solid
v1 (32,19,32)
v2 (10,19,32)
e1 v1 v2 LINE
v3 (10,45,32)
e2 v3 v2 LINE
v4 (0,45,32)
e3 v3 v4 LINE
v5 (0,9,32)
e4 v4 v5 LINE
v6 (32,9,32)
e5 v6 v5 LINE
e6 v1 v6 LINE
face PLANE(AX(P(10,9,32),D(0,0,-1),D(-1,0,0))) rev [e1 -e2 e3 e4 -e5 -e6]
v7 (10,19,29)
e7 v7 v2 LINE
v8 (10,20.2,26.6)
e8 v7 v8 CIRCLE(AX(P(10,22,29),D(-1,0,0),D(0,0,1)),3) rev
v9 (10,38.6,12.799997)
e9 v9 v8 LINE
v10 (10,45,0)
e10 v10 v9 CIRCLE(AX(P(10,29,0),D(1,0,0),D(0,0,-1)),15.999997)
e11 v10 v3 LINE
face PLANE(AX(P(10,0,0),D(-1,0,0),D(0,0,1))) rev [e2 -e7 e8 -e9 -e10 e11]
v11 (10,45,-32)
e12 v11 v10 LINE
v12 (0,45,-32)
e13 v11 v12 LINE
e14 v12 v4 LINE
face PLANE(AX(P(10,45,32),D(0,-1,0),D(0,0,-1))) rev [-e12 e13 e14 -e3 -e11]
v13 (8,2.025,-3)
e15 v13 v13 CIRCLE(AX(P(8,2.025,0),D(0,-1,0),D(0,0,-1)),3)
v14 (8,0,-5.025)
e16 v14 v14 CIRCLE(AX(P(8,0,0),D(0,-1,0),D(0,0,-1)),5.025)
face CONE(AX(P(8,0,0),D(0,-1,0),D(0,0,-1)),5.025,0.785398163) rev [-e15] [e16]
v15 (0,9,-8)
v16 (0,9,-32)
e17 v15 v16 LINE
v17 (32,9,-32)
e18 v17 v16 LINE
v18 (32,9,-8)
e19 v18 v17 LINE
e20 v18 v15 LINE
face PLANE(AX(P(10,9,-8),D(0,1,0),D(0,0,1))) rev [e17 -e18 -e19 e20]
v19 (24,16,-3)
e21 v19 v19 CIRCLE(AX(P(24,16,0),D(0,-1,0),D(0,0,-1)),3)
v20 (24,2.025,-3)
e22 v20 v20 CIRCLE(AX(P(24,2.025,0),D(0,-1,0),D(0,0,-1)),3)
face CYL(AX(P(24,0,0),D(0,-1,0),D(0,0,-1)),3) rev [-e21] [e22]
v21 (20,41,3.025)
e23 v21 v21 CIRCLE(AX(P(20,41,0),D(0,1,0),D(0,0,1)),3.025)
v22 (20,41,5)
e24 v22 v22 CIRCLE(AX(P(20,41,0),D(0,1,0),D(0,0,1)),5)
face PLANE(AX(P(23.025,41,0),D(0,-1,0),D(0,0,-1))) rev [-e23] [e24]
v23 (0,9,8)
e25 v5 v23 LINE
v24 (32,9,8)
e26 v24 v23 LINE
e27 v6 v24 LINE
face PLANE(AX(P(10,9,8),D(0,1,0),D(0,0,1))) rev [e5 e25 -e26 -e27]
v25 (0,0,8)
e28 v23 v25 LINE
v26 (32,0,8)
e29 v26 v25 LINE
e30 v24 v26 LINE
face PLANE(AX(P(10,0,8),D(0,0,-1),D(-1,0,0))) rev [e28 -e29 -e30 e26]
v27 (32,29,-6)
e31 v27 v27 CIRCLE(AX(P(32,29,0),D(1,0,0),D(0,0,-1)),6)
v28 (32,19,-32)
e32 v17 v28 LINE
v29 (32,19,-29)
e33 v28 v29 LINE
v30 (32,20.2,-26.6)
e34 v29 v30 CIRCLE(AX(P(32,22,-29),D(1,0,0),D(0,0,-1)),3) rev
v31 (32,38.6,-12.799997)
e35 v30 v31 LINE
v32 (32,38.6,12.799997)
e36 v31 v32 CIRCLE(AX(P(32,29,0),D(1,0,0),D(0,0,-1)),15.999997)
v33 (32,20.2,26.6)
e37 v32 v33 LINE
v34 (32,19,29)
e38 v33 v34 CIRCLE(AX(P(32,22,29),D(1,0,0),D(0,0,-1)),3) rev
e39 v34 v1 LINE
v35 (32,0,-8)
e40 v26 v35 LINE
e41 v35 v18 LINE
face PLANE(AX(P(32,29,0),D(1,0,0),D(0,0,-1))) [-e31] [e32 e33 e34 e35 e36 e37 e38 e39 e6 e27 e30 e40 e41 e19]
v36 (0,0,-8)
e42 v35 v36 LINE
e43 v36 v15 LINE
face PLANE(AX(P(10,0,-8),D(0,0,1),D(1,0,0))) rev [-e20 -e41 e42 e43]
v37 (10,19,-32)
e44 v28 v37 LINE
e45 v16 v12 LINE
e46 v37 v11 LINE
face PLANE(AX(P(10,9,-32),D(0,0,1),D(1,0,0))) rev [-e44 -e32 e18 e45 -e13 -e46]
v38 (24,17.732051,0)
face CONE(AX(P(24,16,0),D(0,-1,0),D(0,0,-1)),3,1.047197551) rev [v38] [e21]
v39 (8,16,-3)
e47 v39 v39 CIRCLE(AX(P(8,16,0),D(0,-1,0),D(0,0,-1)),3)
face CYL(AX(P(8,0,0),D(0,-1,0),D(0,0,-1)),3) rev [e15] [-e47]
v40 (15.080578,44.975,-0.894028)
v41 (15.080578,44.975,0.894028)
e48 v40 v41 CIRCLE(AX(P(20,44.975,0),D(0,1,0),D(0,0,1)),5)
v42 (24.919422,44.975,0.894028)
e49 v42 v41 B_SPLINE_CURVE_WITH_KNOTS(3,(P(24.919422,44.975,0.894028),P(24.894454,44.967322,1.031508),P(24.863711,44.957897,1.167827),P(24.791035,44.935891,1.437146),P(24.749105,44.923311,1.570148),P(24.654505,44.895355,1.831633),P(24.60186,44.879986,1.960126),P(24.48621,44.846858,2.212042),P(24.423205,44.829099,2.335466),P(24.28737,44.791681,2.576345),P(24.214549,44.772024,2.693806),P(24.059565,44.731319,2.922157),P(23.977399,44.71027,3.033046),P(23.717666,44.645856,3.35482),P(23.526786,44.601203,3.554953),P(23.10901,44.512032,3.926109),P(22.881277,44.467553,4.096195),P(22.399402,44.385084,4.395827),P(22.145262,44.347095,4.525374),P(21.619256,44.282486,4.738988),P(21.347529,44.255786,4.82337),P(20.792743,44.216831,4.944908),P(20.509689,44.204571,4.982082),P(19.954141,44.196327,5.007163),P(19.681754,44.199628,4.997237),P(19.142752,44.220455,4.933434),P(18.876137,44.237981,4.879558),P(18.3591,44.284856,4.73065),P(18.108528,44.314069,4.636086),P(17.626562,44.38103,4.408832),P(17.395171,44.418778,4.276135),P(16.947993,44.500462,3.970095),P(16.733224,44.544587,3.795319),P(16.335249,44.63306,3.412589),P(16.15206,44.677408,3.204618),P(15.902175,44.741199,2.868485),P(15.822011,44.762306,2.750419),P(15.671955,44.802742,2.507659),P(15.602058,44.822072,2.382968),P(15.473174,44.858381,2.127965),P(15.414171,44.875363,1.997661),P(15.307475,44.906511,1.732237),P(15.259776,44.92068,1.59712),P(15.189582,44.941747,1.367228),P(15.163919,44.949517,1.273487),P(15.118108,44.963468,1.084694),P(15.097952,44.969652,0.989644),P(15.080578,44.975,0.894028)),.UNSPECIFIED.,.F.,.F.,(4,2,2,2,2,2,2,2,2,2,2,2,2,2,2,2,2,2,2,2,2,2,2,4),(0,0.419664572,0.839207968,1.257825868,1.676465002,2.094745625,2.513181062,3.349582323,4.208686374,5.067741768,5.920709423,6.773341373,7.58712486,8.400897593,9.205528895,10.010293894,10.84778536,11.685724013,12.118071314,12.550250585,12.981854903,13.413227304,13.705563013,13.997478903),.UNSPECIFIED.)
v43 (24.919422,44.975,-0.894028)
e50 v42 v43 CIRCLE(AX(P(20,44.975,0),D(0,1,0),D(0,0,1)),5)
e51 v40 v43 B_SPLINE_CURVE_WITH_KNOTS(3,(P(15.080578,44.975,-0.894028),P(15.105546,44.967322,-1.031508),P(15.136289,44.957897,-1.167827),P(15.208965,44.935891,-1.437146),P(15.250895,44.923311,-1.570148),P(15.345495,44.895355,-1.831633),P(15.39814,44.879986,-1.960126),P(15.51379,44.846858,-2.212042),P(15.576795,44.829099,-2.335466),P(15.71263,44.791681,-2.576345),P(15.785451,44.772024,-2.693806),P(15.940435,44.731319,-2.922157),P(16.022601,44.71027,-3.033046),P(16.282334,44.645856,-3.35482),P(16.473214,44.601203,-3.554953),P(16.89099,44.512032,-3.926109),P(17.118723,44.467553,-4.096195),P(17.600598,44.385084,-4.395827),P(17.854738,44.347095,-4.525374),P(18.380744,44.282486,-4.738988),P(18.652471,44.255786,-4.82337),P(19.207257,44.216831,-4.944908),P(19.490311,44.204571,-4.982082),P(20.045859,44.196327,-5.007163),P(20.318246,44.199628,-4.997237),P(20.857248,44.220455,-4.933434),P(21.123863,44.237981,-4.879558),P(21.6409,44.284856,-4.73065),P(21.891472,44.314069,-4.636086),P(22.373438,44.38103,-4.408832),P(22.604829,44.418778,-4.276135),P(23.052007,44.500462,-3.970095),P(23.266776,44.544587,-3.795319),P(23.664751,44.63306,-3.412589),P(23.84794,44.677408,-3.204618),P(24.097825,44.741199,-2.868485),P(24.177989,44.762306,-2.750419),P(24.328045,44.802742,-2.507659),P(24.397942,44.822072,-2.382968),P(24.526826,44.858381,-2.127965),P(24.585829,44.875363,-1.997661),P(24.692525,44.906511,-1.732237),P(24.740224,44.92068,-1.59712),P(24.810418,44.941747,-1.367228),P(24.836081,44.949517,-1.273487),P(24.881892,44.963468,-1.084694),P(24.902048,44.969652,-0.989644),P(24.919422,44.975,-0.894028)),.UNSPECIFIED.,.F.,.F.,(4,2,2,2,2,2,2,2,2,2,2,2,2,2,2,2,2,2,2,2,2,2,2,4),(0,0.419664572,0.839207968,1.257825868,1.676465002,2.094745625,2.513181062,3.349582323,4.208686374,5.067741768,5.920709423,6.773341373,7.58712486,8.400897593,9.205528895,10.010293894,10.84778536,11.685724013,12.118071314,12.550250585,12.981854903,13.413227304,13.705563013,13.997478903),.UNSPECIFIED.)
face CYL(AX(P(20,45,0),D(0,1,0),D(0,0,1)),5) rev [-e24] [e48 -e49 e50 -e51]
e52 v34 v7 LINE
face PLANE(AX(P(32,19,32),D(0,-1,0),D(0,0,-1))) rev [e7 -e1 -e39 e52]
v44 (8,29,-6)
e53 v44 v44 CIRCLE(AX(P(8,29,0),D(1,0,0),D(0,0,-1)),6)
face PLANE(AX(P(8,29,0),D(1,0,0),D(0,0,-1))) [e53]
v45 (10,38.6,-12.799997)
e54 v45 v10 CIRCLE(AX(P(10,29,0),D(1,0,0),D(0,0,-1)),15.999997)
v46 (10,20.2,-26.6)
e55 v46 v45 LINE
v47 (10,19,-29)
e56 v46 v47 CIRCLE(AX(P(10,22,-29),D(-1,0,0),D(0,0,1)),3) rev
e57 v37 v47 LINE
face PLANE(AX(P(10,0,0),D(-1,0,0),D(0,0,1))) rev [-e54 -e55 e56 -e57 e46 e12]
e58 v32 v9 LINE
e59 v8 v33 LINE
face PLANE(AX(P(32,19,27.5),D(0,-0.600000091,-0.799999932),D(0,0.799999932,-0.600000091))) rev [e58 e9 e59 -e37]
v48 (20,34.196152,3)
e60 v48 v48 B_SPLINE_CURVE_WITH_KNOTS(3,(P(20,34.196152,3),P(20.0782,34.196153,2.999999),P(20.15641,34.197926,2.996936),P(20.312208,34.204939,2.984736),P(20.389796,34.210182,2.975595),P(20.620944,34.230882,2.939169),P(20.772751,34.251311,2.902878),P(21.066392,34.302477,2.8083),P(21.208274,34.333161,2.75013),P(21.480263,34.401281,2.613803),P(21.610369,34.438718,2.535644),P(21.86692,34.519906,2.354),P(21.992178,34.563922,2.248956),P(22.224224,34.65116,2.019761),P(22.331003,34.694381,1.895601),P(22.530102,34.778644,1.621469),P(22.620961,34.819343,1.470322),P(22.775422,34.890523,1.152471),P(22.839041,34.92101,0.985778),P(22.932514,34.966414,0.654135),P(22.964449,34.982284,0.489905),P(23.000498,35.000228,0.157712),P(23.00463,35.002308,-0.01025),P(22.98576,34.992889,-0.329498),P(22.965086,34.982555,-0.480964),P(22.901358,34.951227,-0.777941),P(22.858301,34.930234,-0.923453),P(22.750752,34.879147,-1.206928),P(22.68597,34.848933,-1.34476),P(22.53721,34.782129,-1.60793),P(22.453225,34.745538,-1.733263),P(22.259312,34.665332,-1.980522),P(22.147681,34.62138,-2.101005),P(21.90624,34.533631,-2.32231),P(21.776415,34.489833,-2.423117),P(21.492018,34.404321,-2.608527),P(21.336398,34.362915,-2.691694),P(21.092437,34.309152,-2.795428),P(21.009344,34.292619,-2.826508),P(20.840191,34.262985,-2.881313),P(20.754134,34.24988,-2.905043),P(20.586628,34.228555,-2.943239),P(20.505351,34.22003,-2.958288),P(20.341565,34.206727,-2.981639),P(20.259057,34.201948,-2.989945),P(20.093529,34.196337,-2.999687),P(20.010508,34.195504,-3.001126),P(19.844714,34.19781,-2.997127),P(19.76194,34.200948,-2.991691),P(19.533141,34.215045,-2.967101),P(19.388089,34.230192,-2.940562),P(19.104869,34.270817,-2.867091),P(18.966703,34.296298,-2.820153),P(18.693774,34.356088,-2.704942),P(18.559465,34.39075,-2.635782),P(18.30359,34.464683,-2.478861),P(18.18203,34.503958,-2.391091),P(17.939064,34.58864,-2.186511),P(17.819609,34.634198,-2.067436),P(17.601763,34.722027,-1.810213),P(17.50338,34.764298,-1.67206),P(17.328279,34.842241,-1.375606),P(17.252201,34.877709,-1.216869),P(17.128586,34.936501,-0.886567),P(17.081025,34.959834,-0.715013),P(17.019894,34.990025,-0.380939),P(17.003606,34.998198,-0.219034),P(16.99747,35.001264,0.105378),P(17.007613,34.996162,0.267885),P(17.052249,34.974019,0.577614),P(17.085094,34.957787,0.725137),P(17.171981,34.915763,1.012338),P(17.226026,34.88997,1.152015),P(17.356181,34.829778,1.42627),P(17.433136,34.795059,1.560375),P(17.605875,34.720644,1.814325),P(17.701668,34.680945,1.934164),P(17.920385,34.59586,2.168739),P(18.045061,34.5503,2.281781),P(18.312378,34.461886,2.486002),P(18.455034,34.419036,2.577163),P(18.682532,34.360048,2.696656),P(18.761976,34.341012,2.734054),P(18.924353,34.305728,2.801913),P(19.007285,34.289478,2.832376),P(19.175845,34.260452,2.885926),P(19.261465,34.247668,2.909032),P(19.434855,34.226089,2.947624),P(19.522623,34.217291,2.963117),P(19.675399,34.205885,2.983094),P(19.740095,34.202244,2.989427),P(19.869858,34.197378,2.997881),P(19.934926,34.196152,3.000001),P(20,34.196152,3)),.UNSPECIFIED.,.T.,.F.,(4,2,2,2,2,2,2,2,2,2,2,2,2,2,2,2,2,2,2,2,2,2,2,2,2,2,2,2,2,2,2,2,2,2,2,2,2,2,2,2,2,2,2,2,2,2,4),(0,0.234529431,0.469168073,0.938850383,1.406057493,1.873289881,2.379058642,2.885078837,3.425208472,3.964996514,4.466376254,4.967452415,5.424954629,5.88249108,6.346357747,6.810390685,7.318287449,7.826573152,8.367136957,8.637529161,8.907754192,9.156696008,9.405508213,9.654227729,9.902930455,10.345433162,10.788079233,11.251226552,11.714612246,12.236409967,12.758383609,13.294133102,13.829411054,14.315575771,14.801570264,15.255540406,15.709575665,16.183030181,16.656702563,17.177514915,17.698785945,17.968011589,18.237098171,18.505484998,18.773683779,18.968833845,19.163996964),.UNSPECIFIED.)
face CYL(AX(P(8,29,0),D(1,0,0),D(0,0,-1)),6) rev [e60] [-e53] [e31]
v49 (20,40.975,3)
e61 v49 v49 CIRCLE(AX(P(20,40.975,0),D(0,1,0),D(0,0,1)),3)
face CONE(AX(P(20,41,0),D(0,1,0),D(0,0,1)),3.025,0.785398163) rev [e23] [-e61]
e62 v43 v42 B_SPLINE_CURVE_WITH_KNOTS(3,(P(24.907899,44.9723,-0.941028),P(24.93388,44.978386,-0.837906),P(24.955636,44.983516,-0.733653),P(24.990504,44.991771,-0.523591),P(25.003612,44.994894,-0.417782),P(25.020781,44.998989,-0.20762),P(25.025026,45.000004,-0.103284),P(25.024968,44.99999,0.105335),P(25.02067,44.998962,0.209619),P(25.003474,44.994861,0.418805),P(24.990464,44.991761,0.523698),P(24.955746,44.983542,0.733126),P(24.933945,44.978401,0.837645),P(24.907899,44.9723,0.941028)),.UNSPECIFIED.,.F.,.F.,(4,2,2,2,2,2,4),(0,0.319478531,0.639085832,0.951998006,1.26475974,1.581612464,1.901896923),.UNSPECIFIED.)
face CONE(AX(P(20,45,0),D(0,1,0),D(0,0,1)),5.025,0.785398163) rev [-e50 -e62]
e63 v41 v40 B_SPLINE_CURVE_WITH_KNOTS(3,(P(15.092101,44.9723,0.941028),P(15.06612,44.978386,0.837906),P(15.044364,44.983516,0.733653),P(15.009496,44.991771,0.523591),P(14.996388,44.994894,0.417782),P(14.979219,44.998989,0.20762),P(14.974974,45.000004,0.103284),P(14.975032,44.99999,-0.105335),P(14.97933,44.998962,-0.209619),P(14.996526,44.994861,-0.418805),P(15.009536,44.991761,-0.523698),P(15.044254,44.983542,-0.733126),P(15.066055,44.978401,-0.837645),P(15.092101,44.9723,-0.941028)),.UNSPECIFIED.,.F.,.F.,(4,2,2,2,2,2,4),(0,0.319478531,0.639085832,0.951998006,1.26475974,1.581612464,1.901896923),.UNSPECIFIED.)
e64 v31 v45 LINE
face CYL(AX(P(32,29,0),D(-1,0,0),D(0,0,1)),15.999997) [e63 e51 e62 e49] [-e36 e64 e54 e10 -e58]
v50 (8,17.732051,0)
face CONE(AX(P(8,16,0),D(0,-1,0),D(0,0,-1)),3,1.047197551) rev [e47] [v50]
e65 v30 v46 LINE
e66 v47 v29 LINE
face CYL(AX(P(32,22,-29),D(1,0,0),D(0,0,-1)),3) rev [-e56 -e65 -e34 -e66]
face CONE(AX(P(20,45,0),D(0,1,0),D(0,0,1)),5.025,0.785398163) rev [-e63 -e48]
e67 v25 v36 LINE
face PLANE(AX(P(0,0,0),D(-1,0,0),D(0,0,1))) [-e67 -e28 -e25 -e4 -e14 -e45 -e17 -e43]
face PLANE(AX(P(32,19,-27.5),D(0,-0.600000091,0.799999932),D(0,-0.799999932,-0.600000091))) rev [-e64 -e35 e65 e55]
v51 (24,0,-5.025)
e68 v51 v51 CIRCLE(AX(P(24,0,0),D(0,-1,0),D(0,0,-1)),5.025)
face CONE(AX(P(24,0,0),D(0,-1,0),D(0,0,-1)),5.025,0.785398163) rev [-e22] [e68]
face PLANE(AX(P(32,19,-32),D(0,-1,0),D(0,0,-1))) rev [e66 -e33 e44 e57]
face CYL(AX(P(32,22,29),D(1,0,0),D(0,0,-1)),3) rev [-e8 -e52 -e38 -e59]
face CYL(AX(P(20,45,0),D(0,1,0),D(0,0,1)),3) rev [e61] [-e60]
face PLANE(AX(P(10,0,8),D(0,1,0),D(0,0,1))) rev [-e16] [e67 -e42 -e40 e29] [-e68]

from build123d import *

# Parameters (mm, degrees)
BOSS_EXTRUDE1_DEPTH = 10
BOSS_EXTRUDE2_DEPTH = 22
SKETCH3_R           = 6
CUT_EXTRUDE1_DEPTH  = 24
LPATTERN1_COUNT     = 2
LPATTERN1_PITCH     = 16
FILLET1_R           = 3


# Read off the part's stored shape, not the designer's step: CBORE for M5 Hex Head Bolt1
with BuildPart() as part:
    # Sketch1 → Boss-Extrude1 (new body)
    with BuildSketch(Plane(origin=(0, 0, 0), x_dir=(0, 0, -1), z_dir=(1, 0, 0))):
        Polygon((-8, 0), (8, 0), (8, 9), (32, 9), (32, 45), (-32, 45), (-32, 9), (-8, 9), align=None)
    extrude(amount=BOSS_EXTRUDE1_DEPTH)

    # Sketch2 → Boss-Extrude2 (add)
    with BuildSketch(Plane(origin=(10, 0, 0), x_dir=(0, 0, -1), z_dir=(1, 0, 0))):
        with BuildLine():
            Line((-32, 9), (-32, 19))
            Line((-32, 19), (-27.5, 19))
            Line((-27.5, 19), (-12.799996672, 38.599999783))
            ThreePointArc((-12.799996672, 38.599999783), (0, 44.999997208), (12.799996672, 38.599999783))
            Line((12.799996672, 38.599999783), (27.5, 19))
            Line((27.5, 19), (32, 19))
            Line((32, 19), (32, 9))
            Line((32, 9), (8, 9))
            Line((8, 9), (8, 0))
            Line((8, 0), (-8, 0))
            Line((-8, 0), (-8, 9))
            Line((-8, 9), (-32, 9))
        make_face()
    extrude(amount=BOSS_EXTRUDE2_DEPTH)

    # Sketch3 → Cut-Extrude1 (cut)
    with BuildSketch(Plane(origin=(32, 0, 0), x_dir=(0, 0, -1), z_dir=(1, 0, 0))):
        with Locations((0, 29)):
            Circle(SKETCH3_R)
    extrude(amount=-CUT_EXTRUDE1_DEPTH, mode=Mode.SUBTRACT)

    # CBORE for M5 Hex Head Bolt1 outline → CBORE for M5 Hex Head Bolt1 (revolve, cut)
    with BuildSketch(Plane(origin=(20, 0, 0), x_dir=(1, 0, 0), z_dir=(0, 0, 1))):
        Polygon((3.025, 41), (5, 41), (5, 44.975), (5.025014792, 45.000014792), (0, 45.000014792), (0, 34.195854076), (3, 34.195854076), (3, 40.975), align=None)
    revolve(axis=Axis((20, 0, 0), (0, 1, 0)), mode=Mode.SUBTRACT)

    # Sketch9 → Ø1.0mm Dowel Hole1 (revolve, cut)
    with BuildSketch(Plane(origin=(24, 0, 0), x_dir=(0, 0, -1), z_dir=(1, 0, 0))):
        Polygon((0, 0), (0, 17.732050808), (3, 16), (3, 2.025), (5.025, 0), align=None)
    f_1_0mm_dowel_hole1 = revolve(axis=Axis((24, -6.35, 0), (0, 1, 0)), mode=Mode.SUBTRACT)

    # LPattern1: Ø1.0mm Dowel Hole1 ×2
    with Locations(*[(-i * LPATTERN1_PITCH, 0, 0) for i in range(1, LPATTERN1_COUNT)]):
        add(f_1_0mm_dowel_hole1, mode=Mode.SUBTRACT)

    # Fillet1
    fillet1_edges = [part.edges().sort_by_distance(p)[0] for p in [
        (21, 19, 27.5),
        (21, 19, -27.5),
    ]]
    fillet(fillet1_edges, radius=FILLET1_R)


solid = part.part
